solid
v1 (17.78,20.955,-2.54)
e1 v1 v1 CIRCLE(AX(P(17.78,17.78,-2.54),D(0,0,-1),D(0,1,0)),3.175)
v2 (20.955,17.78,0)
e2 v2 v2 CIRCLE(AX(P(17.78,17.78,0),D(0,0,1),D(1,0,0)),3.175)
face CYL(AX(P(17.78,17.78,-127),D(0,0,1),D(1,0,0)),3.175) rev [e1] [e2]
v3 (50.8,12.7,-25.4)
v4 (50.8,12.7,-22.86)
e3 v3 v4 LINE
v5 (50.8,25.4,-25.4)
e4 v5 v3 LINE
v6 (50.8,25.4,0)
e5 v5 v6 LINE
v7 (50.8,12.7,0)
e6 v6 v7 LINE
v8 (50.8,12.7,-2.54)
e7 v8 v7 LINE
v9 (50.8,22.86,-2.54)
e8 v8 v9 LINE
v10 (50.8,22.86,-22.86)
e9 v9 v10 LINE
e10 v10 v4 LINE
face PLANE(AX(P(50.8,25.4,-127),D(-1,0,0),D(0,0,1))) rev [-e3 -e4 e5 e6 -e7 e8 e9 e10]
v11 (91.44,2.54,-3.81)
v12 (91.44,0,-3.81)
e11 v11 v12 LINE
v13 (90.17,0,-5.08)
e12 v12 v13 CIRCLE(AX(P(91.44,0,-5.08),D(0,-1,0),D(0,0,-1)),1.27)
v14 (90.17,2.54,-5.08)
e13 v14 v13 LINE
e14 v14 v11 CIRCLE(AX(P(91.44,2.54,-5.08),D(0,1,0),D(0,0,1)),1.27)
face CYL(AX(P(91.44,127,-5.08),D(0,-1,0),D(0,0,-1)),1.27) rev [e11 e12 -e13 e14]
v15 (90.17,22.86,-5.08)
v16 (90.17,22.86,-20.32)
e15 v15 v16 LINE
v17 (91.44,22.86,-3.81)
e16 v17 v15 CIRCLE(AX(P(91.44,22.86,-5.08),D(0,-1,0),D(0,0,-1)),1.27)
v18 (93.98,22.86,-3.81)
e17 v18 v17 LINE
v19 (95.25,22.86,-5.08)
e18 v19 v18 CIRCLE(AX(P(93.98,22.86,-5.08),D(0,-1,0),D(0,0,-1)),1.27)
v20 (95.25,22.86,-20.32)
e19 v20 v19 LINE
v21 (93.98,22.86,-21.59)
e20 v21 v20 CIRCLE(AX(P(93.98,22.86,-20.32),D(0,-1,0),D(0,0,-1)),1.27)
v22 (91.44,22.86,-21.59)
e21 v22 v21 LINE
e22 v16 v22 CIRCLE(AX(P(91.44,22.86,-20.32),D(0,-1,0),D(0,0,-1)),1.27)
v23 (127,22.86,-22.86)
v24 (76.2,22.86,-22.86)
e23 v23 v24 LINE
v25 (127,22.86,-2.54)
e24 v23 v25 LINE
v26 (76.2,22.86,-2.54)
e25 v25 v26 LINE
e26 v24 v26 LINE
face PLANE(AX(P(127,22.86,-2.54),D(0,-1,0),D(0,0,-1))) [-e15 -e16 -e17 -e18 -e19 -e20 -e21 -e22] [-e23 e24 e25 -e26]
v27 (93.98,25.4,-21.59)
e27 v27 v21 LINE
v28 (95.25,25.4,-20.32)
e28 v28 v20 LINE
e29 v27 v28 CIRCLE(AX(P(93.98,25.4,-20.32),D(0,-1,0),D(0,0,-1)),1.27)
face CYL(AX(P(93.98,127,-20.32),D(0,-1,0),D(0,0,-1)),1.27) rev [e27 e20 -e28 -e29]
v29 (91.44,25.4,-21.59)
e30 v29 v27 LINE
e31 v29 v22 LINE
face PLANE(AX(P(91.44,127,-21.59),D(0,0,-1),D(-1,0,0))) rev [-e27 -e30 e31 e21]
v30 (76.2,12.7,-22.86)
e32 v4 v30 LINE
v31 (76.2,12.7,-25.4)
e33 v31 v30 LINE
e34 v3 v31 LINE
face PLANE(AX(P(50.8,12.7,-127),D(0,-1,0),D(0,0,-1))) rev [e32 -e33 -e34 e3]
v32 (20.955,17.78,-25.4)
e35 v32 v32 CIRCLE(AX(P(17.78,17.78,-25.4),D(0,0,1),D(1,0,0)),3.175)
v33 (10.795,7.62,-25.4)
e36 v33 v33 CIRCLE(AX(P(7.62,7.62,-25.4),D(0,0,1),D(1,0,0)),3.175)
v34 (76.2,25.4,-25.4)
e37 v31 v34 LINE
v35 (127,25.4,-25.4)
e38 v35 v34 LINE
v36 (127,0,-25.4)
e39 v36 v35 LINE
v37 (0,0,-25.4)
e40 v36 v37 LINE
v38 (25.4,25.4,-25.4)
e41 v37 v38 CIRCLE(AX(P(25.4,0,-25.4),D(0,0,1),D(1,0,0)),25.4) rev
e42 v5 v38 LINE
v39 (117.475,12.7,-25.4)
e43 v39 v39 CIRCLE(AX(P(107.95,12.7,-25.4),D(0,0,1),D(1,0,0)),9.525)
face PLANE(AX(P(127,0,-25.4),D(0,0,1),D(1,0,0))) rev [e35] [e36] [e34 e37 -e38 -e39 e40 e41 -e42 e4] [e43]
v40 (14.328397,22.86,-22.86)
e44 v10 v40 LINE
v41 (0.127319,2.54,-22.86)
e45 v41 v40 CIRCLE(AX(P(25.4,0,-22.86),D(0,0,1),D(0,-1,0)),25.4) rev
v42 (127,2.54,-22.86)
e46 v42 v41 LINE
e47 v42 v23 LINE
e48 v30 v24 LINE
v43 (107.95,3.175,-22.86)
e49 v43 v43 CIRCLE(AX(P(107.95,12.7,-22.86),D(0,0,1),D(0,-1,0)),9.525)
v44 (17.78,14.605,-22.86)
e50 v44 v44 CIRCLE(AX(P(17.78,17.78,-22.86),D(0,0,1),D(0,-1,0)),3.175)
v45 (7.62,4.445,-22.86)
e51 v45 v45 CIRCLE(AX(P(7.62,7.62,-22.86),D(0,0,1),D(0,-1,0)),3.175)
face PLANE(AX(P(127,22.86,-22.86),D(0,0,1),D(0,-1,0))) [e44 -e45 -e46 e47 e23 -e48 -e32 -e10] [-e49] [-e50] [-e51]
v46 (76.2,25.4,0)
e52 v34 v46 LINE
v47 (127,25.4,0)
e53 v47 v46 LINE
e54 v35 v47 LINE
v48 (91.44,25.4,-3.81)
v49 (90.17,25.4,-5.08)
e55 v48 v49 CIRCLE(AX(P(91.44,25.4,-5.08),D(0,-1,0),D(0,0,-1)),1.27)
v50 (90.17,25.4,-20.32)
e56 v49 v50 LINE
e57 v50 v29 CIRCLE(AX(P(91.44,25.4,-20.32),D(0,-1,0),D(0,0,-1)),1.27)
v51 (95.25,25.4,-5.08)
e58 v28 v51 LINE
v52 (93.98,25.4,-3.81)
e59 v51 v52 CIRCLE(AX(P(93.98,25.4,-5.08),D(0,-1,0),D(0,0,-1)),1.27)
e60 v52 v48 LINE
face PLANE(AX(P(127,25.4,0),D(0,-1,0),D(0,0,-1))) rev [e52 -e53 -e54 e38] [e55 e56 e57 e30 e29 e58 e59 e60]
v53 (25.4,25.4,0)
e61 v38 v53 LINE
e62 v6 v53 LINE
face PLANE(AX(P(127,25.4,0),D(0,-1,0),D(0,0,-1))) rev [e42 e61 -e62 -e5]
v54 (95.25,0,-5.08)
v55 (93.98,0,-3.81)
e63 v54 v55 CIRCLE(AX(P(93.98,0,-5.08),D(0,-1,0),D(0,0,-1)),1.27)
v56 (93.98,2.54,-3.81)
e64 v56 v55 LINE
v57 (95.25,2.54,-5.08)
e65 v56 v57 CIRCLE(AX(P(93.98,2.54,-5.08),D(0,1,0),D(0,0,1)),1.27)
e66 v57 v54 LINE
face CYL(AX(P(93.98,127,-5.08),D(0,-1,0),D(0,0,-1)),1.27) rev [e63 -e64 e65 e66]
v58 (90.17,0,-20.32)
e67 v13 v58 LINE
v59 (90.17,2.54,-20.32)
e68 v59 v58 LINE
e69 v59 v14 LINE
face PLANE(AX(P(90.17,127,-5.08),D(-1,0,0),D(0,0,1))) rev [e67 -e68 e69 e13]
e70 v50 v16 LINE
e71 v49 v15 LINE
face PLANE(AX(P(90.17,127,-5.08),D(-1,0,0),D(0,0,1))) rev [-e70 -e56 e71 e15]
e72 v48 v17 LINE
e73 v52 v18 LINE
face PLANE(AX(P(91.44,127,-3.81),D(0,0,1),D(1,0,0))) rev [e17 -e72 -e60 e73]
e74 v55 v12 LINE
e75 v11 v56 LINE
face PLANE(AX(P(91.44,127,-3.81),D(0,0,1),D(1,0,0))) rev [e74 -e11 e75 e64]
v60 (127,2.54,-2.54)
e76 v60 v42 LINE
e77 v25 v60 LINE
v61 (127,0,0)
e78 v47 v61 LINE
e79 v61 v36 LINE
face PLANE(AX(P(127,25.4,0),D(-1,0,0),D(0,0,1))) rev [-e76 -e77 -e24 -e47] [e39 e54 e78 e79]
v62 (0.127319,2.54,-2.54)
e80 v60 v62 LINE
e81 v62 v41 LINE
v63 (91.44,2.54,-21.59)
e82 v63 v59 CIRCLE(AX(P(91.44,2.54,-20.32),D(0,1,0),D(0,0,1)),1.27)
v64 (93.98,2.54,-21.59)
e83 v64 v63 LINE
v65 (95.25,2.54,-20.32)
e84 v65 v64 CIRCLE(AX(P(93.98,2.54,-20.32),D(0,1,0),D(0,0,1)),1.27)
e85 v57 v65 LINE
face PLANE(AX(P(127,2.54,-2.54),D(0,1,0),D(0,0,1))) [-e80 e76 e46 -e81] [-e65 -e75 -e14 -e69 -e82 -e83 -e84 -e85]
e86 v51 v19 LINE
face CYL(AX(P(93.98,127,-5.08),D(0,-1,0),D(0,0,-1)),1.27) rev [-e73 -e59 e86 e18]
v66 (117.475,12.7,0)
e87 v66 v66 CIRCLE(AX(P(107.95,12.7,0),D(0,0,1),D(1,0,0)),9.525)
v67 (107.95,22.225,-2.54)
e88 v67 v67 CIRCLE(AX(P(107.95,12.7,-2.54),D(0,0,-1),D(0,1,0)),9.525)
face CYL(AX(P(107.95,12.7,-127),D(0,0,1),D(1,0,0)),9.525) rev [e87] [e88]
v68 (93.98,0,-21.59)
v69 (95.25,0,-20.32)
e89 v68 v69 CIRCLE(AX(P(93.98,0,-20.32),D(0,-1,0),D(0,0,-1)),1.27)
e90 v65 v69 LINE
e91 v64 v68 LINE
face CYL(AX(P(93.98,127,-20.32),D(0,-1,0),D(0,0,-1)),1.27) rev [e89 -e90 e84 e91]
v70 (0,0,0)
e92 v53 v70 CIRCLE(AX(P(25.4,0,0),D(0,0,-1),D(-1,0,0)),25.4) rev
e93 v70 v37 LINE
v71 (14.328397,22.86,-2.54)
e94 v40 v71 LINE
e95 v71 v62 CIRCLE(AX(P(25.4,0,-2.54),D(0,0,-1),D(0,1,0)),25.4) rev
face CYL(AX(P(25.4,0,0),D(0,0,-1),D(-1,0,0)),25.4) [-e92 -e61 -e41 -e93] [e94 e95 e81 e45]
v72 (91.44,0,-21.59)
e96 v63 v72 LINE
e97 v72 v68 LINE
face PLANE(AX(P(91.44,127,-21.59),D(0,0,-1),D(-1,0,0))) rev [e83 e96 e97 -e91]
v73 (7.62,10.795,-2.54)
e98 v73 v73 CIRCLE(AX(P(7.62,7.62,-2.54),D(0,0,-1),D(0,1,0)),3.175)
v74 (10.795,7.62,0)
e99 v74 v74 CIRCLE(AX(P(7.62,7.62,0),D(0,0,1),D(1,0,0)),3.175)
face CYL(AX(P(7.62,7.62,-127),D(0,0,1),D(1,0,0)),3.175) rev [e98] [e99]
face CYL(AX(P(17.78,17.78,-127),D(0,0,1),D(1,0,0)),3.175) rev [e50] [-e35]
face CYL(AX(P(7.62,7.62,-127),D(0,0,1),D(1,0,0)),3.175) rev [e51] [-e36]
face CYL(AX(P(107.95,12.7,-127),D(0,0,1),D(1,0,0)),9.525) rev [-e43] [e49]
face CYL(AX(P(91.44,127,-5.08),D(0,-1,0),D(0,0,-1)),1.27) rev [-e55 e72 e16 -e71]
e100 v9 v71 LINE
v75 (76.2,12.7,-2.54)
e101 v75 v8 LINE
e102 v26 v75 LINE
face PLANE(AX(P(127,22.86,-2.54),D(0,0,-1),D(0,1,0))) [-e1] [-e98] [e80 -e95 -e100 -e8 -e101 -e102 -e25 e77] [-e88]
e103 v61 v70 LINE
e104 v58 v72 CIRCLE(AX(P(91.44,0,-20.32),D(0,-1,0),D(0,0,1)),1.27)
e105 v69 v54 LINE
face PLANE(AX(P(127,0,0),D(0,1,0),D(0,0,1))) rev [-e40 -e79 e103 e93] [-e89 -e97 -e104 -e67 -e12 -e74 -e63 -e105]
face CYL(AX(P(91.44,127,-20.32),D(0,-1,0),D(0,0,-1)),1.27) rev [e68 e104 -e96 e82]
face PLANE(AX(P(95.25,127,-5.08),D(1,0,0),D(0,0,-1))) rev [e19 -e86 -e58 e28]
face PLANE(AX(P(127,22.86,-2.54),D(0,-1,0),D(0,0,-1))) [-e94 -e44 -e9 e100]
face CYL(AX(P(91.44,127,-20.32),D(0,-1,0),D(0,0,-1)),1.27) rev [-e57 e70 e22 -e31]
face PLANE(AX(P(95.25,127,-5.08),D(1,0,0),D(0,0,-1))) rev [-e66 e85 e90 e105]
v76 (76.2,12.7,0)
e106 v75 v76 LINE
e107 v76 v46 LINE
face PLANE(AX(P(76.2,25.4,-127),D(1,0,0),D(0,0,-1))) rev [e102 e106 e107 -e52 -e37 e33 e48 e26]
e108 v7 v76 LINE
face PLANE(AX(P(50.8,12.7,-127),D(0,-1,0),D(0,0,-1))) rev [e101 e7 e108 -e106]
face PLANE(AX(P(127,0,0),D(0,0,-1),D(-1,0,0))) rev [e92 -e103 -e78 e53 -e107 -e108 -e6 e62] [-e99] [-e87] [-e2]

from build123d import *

# Parameters (mm, degrees)
SKETCH1_W           = 25.4
SKETCH1_H           = 25.4
SKETCH1_W_2         = 20.32
SKETCH1_H_2         = 20.32
BOSS_EXTRUDE1_DEPTH = 127
SKETCH2_W           = 25.4
SKETCH2_H           = 12.7
CUT_EXTRUDE1_DEPTH  = 127
FILLET1_R           = 25.4
SKETCH3_R           = 3.175
CUT_EXTRUDE2_DEPTH  = 127
SKETCH4_R           = 9.525
CUT_EXTRUDE3_DEPTH  = 127
CUT_EXTRUDE4_DEPTH  = 127


with BuildPart() as part:
    # Sketch1 → Boss-Extrude1 (new body)
    with BuildSketch(Plane(origin=(0, 0, 0), x_dir=(0, 0, -1), z_dir=(1, 0, 0))):
        with Locations((12.7, 12.7)):
            Rectangle(SKETCH1_W, SKETCH1_H)
        with Locations((12.7, 12.7)):
            Rectangle(SKETCH1_W_2, SKETCH1_H_2, mode=Mode.SUBTRACT)
    extrude(amount=BOSS_EXTRUDE1_DEPTH)

    # Sketch2 → Cut-Extrude1 (cut)
    with BuildSketch(Plane.XY):
        with Locations((63.5, 19.05)):
            Rectangle(SKETCH2_W, SKETCH2_H)
    extrude(amount=-CUT_EXTRUDE1_DEPTH, mode=Mode.SUBTRACT)

    # Fillet1
    # the kernel refuses this fillet: 25.4 mm, written as the material it takes off along each edge
    with BuildSketch(Plane(origin=(0, 25.4, -88.9), x_dir=(0, -1, 0), z_dir=(0, 0, 1))) as fillet1_piece_1:
        with BuildLine():
            CenterArc((FILLET1_R, FILLET1_R), FILLET1_R, 180, 90)
            Line((0, FILLET1_R), (0, 0))
            Line((0, 0), (FILLET1_R, 0))
        make_face()
    extrude(amount=152.4, mode=Mode.SUBTRACT)

    # Sketch3 → Cut-Extrude2 (cut)
    with BuildSketch(Plane.XY):
        with Locations((7.62, 7.62)):
            Circle(SKETCH3_R)
        with Locations((17.78, 17.78)):
            Circle(SKETCH3_R)
    extrude(amount=-CUT_EXTRUDE2_DEPTH, mode=Mode.SUBTRACT)

    # Sketch4 → Cut-Extrude3 (cut)
    with BuildSketch(Plane.XY):
        with Locations((107.95, 12.7)):
            Circle(SKETCH4_R)
    extrude(amount=-CUT_EXTRUDE3_DEPTH, mode=Mode.SUBTRACT)

    # Sketch5 → Cut-Extrude4 (cut)
    with BuildSketch(Plane.XZ):
        with BuildLine():
            Line((91.44, -3.81), (93.98, -3.81))
            ThreePointArc((93.98, -3.81), (94.878025612, -4.181974388), (95.25, -5.08))
            Line((95.25, -5.08), (95.25, -20.32))
            ThreePointArc((95.25, -20.32), (94.878025612, -21.218025612), (93.98, -21.59))
            Line((93.98, -21.59), (91.44, -21.59))
            ThreePointArc((91.44, -21.59), (90.541974388, -21.218025612), (90.17, -20.32))
            Line((90.17, -20.32), (90.17, -5.08))
            ThreePointArc((90.17, -5.08), (90.541974388, -4.181974388), (91.44, -3.81))
        make_face()
    extrude(amount=-CUT_EXTRUDE4_DEPTH, mode=Mode.SUBTRACT)


solid = part.part
